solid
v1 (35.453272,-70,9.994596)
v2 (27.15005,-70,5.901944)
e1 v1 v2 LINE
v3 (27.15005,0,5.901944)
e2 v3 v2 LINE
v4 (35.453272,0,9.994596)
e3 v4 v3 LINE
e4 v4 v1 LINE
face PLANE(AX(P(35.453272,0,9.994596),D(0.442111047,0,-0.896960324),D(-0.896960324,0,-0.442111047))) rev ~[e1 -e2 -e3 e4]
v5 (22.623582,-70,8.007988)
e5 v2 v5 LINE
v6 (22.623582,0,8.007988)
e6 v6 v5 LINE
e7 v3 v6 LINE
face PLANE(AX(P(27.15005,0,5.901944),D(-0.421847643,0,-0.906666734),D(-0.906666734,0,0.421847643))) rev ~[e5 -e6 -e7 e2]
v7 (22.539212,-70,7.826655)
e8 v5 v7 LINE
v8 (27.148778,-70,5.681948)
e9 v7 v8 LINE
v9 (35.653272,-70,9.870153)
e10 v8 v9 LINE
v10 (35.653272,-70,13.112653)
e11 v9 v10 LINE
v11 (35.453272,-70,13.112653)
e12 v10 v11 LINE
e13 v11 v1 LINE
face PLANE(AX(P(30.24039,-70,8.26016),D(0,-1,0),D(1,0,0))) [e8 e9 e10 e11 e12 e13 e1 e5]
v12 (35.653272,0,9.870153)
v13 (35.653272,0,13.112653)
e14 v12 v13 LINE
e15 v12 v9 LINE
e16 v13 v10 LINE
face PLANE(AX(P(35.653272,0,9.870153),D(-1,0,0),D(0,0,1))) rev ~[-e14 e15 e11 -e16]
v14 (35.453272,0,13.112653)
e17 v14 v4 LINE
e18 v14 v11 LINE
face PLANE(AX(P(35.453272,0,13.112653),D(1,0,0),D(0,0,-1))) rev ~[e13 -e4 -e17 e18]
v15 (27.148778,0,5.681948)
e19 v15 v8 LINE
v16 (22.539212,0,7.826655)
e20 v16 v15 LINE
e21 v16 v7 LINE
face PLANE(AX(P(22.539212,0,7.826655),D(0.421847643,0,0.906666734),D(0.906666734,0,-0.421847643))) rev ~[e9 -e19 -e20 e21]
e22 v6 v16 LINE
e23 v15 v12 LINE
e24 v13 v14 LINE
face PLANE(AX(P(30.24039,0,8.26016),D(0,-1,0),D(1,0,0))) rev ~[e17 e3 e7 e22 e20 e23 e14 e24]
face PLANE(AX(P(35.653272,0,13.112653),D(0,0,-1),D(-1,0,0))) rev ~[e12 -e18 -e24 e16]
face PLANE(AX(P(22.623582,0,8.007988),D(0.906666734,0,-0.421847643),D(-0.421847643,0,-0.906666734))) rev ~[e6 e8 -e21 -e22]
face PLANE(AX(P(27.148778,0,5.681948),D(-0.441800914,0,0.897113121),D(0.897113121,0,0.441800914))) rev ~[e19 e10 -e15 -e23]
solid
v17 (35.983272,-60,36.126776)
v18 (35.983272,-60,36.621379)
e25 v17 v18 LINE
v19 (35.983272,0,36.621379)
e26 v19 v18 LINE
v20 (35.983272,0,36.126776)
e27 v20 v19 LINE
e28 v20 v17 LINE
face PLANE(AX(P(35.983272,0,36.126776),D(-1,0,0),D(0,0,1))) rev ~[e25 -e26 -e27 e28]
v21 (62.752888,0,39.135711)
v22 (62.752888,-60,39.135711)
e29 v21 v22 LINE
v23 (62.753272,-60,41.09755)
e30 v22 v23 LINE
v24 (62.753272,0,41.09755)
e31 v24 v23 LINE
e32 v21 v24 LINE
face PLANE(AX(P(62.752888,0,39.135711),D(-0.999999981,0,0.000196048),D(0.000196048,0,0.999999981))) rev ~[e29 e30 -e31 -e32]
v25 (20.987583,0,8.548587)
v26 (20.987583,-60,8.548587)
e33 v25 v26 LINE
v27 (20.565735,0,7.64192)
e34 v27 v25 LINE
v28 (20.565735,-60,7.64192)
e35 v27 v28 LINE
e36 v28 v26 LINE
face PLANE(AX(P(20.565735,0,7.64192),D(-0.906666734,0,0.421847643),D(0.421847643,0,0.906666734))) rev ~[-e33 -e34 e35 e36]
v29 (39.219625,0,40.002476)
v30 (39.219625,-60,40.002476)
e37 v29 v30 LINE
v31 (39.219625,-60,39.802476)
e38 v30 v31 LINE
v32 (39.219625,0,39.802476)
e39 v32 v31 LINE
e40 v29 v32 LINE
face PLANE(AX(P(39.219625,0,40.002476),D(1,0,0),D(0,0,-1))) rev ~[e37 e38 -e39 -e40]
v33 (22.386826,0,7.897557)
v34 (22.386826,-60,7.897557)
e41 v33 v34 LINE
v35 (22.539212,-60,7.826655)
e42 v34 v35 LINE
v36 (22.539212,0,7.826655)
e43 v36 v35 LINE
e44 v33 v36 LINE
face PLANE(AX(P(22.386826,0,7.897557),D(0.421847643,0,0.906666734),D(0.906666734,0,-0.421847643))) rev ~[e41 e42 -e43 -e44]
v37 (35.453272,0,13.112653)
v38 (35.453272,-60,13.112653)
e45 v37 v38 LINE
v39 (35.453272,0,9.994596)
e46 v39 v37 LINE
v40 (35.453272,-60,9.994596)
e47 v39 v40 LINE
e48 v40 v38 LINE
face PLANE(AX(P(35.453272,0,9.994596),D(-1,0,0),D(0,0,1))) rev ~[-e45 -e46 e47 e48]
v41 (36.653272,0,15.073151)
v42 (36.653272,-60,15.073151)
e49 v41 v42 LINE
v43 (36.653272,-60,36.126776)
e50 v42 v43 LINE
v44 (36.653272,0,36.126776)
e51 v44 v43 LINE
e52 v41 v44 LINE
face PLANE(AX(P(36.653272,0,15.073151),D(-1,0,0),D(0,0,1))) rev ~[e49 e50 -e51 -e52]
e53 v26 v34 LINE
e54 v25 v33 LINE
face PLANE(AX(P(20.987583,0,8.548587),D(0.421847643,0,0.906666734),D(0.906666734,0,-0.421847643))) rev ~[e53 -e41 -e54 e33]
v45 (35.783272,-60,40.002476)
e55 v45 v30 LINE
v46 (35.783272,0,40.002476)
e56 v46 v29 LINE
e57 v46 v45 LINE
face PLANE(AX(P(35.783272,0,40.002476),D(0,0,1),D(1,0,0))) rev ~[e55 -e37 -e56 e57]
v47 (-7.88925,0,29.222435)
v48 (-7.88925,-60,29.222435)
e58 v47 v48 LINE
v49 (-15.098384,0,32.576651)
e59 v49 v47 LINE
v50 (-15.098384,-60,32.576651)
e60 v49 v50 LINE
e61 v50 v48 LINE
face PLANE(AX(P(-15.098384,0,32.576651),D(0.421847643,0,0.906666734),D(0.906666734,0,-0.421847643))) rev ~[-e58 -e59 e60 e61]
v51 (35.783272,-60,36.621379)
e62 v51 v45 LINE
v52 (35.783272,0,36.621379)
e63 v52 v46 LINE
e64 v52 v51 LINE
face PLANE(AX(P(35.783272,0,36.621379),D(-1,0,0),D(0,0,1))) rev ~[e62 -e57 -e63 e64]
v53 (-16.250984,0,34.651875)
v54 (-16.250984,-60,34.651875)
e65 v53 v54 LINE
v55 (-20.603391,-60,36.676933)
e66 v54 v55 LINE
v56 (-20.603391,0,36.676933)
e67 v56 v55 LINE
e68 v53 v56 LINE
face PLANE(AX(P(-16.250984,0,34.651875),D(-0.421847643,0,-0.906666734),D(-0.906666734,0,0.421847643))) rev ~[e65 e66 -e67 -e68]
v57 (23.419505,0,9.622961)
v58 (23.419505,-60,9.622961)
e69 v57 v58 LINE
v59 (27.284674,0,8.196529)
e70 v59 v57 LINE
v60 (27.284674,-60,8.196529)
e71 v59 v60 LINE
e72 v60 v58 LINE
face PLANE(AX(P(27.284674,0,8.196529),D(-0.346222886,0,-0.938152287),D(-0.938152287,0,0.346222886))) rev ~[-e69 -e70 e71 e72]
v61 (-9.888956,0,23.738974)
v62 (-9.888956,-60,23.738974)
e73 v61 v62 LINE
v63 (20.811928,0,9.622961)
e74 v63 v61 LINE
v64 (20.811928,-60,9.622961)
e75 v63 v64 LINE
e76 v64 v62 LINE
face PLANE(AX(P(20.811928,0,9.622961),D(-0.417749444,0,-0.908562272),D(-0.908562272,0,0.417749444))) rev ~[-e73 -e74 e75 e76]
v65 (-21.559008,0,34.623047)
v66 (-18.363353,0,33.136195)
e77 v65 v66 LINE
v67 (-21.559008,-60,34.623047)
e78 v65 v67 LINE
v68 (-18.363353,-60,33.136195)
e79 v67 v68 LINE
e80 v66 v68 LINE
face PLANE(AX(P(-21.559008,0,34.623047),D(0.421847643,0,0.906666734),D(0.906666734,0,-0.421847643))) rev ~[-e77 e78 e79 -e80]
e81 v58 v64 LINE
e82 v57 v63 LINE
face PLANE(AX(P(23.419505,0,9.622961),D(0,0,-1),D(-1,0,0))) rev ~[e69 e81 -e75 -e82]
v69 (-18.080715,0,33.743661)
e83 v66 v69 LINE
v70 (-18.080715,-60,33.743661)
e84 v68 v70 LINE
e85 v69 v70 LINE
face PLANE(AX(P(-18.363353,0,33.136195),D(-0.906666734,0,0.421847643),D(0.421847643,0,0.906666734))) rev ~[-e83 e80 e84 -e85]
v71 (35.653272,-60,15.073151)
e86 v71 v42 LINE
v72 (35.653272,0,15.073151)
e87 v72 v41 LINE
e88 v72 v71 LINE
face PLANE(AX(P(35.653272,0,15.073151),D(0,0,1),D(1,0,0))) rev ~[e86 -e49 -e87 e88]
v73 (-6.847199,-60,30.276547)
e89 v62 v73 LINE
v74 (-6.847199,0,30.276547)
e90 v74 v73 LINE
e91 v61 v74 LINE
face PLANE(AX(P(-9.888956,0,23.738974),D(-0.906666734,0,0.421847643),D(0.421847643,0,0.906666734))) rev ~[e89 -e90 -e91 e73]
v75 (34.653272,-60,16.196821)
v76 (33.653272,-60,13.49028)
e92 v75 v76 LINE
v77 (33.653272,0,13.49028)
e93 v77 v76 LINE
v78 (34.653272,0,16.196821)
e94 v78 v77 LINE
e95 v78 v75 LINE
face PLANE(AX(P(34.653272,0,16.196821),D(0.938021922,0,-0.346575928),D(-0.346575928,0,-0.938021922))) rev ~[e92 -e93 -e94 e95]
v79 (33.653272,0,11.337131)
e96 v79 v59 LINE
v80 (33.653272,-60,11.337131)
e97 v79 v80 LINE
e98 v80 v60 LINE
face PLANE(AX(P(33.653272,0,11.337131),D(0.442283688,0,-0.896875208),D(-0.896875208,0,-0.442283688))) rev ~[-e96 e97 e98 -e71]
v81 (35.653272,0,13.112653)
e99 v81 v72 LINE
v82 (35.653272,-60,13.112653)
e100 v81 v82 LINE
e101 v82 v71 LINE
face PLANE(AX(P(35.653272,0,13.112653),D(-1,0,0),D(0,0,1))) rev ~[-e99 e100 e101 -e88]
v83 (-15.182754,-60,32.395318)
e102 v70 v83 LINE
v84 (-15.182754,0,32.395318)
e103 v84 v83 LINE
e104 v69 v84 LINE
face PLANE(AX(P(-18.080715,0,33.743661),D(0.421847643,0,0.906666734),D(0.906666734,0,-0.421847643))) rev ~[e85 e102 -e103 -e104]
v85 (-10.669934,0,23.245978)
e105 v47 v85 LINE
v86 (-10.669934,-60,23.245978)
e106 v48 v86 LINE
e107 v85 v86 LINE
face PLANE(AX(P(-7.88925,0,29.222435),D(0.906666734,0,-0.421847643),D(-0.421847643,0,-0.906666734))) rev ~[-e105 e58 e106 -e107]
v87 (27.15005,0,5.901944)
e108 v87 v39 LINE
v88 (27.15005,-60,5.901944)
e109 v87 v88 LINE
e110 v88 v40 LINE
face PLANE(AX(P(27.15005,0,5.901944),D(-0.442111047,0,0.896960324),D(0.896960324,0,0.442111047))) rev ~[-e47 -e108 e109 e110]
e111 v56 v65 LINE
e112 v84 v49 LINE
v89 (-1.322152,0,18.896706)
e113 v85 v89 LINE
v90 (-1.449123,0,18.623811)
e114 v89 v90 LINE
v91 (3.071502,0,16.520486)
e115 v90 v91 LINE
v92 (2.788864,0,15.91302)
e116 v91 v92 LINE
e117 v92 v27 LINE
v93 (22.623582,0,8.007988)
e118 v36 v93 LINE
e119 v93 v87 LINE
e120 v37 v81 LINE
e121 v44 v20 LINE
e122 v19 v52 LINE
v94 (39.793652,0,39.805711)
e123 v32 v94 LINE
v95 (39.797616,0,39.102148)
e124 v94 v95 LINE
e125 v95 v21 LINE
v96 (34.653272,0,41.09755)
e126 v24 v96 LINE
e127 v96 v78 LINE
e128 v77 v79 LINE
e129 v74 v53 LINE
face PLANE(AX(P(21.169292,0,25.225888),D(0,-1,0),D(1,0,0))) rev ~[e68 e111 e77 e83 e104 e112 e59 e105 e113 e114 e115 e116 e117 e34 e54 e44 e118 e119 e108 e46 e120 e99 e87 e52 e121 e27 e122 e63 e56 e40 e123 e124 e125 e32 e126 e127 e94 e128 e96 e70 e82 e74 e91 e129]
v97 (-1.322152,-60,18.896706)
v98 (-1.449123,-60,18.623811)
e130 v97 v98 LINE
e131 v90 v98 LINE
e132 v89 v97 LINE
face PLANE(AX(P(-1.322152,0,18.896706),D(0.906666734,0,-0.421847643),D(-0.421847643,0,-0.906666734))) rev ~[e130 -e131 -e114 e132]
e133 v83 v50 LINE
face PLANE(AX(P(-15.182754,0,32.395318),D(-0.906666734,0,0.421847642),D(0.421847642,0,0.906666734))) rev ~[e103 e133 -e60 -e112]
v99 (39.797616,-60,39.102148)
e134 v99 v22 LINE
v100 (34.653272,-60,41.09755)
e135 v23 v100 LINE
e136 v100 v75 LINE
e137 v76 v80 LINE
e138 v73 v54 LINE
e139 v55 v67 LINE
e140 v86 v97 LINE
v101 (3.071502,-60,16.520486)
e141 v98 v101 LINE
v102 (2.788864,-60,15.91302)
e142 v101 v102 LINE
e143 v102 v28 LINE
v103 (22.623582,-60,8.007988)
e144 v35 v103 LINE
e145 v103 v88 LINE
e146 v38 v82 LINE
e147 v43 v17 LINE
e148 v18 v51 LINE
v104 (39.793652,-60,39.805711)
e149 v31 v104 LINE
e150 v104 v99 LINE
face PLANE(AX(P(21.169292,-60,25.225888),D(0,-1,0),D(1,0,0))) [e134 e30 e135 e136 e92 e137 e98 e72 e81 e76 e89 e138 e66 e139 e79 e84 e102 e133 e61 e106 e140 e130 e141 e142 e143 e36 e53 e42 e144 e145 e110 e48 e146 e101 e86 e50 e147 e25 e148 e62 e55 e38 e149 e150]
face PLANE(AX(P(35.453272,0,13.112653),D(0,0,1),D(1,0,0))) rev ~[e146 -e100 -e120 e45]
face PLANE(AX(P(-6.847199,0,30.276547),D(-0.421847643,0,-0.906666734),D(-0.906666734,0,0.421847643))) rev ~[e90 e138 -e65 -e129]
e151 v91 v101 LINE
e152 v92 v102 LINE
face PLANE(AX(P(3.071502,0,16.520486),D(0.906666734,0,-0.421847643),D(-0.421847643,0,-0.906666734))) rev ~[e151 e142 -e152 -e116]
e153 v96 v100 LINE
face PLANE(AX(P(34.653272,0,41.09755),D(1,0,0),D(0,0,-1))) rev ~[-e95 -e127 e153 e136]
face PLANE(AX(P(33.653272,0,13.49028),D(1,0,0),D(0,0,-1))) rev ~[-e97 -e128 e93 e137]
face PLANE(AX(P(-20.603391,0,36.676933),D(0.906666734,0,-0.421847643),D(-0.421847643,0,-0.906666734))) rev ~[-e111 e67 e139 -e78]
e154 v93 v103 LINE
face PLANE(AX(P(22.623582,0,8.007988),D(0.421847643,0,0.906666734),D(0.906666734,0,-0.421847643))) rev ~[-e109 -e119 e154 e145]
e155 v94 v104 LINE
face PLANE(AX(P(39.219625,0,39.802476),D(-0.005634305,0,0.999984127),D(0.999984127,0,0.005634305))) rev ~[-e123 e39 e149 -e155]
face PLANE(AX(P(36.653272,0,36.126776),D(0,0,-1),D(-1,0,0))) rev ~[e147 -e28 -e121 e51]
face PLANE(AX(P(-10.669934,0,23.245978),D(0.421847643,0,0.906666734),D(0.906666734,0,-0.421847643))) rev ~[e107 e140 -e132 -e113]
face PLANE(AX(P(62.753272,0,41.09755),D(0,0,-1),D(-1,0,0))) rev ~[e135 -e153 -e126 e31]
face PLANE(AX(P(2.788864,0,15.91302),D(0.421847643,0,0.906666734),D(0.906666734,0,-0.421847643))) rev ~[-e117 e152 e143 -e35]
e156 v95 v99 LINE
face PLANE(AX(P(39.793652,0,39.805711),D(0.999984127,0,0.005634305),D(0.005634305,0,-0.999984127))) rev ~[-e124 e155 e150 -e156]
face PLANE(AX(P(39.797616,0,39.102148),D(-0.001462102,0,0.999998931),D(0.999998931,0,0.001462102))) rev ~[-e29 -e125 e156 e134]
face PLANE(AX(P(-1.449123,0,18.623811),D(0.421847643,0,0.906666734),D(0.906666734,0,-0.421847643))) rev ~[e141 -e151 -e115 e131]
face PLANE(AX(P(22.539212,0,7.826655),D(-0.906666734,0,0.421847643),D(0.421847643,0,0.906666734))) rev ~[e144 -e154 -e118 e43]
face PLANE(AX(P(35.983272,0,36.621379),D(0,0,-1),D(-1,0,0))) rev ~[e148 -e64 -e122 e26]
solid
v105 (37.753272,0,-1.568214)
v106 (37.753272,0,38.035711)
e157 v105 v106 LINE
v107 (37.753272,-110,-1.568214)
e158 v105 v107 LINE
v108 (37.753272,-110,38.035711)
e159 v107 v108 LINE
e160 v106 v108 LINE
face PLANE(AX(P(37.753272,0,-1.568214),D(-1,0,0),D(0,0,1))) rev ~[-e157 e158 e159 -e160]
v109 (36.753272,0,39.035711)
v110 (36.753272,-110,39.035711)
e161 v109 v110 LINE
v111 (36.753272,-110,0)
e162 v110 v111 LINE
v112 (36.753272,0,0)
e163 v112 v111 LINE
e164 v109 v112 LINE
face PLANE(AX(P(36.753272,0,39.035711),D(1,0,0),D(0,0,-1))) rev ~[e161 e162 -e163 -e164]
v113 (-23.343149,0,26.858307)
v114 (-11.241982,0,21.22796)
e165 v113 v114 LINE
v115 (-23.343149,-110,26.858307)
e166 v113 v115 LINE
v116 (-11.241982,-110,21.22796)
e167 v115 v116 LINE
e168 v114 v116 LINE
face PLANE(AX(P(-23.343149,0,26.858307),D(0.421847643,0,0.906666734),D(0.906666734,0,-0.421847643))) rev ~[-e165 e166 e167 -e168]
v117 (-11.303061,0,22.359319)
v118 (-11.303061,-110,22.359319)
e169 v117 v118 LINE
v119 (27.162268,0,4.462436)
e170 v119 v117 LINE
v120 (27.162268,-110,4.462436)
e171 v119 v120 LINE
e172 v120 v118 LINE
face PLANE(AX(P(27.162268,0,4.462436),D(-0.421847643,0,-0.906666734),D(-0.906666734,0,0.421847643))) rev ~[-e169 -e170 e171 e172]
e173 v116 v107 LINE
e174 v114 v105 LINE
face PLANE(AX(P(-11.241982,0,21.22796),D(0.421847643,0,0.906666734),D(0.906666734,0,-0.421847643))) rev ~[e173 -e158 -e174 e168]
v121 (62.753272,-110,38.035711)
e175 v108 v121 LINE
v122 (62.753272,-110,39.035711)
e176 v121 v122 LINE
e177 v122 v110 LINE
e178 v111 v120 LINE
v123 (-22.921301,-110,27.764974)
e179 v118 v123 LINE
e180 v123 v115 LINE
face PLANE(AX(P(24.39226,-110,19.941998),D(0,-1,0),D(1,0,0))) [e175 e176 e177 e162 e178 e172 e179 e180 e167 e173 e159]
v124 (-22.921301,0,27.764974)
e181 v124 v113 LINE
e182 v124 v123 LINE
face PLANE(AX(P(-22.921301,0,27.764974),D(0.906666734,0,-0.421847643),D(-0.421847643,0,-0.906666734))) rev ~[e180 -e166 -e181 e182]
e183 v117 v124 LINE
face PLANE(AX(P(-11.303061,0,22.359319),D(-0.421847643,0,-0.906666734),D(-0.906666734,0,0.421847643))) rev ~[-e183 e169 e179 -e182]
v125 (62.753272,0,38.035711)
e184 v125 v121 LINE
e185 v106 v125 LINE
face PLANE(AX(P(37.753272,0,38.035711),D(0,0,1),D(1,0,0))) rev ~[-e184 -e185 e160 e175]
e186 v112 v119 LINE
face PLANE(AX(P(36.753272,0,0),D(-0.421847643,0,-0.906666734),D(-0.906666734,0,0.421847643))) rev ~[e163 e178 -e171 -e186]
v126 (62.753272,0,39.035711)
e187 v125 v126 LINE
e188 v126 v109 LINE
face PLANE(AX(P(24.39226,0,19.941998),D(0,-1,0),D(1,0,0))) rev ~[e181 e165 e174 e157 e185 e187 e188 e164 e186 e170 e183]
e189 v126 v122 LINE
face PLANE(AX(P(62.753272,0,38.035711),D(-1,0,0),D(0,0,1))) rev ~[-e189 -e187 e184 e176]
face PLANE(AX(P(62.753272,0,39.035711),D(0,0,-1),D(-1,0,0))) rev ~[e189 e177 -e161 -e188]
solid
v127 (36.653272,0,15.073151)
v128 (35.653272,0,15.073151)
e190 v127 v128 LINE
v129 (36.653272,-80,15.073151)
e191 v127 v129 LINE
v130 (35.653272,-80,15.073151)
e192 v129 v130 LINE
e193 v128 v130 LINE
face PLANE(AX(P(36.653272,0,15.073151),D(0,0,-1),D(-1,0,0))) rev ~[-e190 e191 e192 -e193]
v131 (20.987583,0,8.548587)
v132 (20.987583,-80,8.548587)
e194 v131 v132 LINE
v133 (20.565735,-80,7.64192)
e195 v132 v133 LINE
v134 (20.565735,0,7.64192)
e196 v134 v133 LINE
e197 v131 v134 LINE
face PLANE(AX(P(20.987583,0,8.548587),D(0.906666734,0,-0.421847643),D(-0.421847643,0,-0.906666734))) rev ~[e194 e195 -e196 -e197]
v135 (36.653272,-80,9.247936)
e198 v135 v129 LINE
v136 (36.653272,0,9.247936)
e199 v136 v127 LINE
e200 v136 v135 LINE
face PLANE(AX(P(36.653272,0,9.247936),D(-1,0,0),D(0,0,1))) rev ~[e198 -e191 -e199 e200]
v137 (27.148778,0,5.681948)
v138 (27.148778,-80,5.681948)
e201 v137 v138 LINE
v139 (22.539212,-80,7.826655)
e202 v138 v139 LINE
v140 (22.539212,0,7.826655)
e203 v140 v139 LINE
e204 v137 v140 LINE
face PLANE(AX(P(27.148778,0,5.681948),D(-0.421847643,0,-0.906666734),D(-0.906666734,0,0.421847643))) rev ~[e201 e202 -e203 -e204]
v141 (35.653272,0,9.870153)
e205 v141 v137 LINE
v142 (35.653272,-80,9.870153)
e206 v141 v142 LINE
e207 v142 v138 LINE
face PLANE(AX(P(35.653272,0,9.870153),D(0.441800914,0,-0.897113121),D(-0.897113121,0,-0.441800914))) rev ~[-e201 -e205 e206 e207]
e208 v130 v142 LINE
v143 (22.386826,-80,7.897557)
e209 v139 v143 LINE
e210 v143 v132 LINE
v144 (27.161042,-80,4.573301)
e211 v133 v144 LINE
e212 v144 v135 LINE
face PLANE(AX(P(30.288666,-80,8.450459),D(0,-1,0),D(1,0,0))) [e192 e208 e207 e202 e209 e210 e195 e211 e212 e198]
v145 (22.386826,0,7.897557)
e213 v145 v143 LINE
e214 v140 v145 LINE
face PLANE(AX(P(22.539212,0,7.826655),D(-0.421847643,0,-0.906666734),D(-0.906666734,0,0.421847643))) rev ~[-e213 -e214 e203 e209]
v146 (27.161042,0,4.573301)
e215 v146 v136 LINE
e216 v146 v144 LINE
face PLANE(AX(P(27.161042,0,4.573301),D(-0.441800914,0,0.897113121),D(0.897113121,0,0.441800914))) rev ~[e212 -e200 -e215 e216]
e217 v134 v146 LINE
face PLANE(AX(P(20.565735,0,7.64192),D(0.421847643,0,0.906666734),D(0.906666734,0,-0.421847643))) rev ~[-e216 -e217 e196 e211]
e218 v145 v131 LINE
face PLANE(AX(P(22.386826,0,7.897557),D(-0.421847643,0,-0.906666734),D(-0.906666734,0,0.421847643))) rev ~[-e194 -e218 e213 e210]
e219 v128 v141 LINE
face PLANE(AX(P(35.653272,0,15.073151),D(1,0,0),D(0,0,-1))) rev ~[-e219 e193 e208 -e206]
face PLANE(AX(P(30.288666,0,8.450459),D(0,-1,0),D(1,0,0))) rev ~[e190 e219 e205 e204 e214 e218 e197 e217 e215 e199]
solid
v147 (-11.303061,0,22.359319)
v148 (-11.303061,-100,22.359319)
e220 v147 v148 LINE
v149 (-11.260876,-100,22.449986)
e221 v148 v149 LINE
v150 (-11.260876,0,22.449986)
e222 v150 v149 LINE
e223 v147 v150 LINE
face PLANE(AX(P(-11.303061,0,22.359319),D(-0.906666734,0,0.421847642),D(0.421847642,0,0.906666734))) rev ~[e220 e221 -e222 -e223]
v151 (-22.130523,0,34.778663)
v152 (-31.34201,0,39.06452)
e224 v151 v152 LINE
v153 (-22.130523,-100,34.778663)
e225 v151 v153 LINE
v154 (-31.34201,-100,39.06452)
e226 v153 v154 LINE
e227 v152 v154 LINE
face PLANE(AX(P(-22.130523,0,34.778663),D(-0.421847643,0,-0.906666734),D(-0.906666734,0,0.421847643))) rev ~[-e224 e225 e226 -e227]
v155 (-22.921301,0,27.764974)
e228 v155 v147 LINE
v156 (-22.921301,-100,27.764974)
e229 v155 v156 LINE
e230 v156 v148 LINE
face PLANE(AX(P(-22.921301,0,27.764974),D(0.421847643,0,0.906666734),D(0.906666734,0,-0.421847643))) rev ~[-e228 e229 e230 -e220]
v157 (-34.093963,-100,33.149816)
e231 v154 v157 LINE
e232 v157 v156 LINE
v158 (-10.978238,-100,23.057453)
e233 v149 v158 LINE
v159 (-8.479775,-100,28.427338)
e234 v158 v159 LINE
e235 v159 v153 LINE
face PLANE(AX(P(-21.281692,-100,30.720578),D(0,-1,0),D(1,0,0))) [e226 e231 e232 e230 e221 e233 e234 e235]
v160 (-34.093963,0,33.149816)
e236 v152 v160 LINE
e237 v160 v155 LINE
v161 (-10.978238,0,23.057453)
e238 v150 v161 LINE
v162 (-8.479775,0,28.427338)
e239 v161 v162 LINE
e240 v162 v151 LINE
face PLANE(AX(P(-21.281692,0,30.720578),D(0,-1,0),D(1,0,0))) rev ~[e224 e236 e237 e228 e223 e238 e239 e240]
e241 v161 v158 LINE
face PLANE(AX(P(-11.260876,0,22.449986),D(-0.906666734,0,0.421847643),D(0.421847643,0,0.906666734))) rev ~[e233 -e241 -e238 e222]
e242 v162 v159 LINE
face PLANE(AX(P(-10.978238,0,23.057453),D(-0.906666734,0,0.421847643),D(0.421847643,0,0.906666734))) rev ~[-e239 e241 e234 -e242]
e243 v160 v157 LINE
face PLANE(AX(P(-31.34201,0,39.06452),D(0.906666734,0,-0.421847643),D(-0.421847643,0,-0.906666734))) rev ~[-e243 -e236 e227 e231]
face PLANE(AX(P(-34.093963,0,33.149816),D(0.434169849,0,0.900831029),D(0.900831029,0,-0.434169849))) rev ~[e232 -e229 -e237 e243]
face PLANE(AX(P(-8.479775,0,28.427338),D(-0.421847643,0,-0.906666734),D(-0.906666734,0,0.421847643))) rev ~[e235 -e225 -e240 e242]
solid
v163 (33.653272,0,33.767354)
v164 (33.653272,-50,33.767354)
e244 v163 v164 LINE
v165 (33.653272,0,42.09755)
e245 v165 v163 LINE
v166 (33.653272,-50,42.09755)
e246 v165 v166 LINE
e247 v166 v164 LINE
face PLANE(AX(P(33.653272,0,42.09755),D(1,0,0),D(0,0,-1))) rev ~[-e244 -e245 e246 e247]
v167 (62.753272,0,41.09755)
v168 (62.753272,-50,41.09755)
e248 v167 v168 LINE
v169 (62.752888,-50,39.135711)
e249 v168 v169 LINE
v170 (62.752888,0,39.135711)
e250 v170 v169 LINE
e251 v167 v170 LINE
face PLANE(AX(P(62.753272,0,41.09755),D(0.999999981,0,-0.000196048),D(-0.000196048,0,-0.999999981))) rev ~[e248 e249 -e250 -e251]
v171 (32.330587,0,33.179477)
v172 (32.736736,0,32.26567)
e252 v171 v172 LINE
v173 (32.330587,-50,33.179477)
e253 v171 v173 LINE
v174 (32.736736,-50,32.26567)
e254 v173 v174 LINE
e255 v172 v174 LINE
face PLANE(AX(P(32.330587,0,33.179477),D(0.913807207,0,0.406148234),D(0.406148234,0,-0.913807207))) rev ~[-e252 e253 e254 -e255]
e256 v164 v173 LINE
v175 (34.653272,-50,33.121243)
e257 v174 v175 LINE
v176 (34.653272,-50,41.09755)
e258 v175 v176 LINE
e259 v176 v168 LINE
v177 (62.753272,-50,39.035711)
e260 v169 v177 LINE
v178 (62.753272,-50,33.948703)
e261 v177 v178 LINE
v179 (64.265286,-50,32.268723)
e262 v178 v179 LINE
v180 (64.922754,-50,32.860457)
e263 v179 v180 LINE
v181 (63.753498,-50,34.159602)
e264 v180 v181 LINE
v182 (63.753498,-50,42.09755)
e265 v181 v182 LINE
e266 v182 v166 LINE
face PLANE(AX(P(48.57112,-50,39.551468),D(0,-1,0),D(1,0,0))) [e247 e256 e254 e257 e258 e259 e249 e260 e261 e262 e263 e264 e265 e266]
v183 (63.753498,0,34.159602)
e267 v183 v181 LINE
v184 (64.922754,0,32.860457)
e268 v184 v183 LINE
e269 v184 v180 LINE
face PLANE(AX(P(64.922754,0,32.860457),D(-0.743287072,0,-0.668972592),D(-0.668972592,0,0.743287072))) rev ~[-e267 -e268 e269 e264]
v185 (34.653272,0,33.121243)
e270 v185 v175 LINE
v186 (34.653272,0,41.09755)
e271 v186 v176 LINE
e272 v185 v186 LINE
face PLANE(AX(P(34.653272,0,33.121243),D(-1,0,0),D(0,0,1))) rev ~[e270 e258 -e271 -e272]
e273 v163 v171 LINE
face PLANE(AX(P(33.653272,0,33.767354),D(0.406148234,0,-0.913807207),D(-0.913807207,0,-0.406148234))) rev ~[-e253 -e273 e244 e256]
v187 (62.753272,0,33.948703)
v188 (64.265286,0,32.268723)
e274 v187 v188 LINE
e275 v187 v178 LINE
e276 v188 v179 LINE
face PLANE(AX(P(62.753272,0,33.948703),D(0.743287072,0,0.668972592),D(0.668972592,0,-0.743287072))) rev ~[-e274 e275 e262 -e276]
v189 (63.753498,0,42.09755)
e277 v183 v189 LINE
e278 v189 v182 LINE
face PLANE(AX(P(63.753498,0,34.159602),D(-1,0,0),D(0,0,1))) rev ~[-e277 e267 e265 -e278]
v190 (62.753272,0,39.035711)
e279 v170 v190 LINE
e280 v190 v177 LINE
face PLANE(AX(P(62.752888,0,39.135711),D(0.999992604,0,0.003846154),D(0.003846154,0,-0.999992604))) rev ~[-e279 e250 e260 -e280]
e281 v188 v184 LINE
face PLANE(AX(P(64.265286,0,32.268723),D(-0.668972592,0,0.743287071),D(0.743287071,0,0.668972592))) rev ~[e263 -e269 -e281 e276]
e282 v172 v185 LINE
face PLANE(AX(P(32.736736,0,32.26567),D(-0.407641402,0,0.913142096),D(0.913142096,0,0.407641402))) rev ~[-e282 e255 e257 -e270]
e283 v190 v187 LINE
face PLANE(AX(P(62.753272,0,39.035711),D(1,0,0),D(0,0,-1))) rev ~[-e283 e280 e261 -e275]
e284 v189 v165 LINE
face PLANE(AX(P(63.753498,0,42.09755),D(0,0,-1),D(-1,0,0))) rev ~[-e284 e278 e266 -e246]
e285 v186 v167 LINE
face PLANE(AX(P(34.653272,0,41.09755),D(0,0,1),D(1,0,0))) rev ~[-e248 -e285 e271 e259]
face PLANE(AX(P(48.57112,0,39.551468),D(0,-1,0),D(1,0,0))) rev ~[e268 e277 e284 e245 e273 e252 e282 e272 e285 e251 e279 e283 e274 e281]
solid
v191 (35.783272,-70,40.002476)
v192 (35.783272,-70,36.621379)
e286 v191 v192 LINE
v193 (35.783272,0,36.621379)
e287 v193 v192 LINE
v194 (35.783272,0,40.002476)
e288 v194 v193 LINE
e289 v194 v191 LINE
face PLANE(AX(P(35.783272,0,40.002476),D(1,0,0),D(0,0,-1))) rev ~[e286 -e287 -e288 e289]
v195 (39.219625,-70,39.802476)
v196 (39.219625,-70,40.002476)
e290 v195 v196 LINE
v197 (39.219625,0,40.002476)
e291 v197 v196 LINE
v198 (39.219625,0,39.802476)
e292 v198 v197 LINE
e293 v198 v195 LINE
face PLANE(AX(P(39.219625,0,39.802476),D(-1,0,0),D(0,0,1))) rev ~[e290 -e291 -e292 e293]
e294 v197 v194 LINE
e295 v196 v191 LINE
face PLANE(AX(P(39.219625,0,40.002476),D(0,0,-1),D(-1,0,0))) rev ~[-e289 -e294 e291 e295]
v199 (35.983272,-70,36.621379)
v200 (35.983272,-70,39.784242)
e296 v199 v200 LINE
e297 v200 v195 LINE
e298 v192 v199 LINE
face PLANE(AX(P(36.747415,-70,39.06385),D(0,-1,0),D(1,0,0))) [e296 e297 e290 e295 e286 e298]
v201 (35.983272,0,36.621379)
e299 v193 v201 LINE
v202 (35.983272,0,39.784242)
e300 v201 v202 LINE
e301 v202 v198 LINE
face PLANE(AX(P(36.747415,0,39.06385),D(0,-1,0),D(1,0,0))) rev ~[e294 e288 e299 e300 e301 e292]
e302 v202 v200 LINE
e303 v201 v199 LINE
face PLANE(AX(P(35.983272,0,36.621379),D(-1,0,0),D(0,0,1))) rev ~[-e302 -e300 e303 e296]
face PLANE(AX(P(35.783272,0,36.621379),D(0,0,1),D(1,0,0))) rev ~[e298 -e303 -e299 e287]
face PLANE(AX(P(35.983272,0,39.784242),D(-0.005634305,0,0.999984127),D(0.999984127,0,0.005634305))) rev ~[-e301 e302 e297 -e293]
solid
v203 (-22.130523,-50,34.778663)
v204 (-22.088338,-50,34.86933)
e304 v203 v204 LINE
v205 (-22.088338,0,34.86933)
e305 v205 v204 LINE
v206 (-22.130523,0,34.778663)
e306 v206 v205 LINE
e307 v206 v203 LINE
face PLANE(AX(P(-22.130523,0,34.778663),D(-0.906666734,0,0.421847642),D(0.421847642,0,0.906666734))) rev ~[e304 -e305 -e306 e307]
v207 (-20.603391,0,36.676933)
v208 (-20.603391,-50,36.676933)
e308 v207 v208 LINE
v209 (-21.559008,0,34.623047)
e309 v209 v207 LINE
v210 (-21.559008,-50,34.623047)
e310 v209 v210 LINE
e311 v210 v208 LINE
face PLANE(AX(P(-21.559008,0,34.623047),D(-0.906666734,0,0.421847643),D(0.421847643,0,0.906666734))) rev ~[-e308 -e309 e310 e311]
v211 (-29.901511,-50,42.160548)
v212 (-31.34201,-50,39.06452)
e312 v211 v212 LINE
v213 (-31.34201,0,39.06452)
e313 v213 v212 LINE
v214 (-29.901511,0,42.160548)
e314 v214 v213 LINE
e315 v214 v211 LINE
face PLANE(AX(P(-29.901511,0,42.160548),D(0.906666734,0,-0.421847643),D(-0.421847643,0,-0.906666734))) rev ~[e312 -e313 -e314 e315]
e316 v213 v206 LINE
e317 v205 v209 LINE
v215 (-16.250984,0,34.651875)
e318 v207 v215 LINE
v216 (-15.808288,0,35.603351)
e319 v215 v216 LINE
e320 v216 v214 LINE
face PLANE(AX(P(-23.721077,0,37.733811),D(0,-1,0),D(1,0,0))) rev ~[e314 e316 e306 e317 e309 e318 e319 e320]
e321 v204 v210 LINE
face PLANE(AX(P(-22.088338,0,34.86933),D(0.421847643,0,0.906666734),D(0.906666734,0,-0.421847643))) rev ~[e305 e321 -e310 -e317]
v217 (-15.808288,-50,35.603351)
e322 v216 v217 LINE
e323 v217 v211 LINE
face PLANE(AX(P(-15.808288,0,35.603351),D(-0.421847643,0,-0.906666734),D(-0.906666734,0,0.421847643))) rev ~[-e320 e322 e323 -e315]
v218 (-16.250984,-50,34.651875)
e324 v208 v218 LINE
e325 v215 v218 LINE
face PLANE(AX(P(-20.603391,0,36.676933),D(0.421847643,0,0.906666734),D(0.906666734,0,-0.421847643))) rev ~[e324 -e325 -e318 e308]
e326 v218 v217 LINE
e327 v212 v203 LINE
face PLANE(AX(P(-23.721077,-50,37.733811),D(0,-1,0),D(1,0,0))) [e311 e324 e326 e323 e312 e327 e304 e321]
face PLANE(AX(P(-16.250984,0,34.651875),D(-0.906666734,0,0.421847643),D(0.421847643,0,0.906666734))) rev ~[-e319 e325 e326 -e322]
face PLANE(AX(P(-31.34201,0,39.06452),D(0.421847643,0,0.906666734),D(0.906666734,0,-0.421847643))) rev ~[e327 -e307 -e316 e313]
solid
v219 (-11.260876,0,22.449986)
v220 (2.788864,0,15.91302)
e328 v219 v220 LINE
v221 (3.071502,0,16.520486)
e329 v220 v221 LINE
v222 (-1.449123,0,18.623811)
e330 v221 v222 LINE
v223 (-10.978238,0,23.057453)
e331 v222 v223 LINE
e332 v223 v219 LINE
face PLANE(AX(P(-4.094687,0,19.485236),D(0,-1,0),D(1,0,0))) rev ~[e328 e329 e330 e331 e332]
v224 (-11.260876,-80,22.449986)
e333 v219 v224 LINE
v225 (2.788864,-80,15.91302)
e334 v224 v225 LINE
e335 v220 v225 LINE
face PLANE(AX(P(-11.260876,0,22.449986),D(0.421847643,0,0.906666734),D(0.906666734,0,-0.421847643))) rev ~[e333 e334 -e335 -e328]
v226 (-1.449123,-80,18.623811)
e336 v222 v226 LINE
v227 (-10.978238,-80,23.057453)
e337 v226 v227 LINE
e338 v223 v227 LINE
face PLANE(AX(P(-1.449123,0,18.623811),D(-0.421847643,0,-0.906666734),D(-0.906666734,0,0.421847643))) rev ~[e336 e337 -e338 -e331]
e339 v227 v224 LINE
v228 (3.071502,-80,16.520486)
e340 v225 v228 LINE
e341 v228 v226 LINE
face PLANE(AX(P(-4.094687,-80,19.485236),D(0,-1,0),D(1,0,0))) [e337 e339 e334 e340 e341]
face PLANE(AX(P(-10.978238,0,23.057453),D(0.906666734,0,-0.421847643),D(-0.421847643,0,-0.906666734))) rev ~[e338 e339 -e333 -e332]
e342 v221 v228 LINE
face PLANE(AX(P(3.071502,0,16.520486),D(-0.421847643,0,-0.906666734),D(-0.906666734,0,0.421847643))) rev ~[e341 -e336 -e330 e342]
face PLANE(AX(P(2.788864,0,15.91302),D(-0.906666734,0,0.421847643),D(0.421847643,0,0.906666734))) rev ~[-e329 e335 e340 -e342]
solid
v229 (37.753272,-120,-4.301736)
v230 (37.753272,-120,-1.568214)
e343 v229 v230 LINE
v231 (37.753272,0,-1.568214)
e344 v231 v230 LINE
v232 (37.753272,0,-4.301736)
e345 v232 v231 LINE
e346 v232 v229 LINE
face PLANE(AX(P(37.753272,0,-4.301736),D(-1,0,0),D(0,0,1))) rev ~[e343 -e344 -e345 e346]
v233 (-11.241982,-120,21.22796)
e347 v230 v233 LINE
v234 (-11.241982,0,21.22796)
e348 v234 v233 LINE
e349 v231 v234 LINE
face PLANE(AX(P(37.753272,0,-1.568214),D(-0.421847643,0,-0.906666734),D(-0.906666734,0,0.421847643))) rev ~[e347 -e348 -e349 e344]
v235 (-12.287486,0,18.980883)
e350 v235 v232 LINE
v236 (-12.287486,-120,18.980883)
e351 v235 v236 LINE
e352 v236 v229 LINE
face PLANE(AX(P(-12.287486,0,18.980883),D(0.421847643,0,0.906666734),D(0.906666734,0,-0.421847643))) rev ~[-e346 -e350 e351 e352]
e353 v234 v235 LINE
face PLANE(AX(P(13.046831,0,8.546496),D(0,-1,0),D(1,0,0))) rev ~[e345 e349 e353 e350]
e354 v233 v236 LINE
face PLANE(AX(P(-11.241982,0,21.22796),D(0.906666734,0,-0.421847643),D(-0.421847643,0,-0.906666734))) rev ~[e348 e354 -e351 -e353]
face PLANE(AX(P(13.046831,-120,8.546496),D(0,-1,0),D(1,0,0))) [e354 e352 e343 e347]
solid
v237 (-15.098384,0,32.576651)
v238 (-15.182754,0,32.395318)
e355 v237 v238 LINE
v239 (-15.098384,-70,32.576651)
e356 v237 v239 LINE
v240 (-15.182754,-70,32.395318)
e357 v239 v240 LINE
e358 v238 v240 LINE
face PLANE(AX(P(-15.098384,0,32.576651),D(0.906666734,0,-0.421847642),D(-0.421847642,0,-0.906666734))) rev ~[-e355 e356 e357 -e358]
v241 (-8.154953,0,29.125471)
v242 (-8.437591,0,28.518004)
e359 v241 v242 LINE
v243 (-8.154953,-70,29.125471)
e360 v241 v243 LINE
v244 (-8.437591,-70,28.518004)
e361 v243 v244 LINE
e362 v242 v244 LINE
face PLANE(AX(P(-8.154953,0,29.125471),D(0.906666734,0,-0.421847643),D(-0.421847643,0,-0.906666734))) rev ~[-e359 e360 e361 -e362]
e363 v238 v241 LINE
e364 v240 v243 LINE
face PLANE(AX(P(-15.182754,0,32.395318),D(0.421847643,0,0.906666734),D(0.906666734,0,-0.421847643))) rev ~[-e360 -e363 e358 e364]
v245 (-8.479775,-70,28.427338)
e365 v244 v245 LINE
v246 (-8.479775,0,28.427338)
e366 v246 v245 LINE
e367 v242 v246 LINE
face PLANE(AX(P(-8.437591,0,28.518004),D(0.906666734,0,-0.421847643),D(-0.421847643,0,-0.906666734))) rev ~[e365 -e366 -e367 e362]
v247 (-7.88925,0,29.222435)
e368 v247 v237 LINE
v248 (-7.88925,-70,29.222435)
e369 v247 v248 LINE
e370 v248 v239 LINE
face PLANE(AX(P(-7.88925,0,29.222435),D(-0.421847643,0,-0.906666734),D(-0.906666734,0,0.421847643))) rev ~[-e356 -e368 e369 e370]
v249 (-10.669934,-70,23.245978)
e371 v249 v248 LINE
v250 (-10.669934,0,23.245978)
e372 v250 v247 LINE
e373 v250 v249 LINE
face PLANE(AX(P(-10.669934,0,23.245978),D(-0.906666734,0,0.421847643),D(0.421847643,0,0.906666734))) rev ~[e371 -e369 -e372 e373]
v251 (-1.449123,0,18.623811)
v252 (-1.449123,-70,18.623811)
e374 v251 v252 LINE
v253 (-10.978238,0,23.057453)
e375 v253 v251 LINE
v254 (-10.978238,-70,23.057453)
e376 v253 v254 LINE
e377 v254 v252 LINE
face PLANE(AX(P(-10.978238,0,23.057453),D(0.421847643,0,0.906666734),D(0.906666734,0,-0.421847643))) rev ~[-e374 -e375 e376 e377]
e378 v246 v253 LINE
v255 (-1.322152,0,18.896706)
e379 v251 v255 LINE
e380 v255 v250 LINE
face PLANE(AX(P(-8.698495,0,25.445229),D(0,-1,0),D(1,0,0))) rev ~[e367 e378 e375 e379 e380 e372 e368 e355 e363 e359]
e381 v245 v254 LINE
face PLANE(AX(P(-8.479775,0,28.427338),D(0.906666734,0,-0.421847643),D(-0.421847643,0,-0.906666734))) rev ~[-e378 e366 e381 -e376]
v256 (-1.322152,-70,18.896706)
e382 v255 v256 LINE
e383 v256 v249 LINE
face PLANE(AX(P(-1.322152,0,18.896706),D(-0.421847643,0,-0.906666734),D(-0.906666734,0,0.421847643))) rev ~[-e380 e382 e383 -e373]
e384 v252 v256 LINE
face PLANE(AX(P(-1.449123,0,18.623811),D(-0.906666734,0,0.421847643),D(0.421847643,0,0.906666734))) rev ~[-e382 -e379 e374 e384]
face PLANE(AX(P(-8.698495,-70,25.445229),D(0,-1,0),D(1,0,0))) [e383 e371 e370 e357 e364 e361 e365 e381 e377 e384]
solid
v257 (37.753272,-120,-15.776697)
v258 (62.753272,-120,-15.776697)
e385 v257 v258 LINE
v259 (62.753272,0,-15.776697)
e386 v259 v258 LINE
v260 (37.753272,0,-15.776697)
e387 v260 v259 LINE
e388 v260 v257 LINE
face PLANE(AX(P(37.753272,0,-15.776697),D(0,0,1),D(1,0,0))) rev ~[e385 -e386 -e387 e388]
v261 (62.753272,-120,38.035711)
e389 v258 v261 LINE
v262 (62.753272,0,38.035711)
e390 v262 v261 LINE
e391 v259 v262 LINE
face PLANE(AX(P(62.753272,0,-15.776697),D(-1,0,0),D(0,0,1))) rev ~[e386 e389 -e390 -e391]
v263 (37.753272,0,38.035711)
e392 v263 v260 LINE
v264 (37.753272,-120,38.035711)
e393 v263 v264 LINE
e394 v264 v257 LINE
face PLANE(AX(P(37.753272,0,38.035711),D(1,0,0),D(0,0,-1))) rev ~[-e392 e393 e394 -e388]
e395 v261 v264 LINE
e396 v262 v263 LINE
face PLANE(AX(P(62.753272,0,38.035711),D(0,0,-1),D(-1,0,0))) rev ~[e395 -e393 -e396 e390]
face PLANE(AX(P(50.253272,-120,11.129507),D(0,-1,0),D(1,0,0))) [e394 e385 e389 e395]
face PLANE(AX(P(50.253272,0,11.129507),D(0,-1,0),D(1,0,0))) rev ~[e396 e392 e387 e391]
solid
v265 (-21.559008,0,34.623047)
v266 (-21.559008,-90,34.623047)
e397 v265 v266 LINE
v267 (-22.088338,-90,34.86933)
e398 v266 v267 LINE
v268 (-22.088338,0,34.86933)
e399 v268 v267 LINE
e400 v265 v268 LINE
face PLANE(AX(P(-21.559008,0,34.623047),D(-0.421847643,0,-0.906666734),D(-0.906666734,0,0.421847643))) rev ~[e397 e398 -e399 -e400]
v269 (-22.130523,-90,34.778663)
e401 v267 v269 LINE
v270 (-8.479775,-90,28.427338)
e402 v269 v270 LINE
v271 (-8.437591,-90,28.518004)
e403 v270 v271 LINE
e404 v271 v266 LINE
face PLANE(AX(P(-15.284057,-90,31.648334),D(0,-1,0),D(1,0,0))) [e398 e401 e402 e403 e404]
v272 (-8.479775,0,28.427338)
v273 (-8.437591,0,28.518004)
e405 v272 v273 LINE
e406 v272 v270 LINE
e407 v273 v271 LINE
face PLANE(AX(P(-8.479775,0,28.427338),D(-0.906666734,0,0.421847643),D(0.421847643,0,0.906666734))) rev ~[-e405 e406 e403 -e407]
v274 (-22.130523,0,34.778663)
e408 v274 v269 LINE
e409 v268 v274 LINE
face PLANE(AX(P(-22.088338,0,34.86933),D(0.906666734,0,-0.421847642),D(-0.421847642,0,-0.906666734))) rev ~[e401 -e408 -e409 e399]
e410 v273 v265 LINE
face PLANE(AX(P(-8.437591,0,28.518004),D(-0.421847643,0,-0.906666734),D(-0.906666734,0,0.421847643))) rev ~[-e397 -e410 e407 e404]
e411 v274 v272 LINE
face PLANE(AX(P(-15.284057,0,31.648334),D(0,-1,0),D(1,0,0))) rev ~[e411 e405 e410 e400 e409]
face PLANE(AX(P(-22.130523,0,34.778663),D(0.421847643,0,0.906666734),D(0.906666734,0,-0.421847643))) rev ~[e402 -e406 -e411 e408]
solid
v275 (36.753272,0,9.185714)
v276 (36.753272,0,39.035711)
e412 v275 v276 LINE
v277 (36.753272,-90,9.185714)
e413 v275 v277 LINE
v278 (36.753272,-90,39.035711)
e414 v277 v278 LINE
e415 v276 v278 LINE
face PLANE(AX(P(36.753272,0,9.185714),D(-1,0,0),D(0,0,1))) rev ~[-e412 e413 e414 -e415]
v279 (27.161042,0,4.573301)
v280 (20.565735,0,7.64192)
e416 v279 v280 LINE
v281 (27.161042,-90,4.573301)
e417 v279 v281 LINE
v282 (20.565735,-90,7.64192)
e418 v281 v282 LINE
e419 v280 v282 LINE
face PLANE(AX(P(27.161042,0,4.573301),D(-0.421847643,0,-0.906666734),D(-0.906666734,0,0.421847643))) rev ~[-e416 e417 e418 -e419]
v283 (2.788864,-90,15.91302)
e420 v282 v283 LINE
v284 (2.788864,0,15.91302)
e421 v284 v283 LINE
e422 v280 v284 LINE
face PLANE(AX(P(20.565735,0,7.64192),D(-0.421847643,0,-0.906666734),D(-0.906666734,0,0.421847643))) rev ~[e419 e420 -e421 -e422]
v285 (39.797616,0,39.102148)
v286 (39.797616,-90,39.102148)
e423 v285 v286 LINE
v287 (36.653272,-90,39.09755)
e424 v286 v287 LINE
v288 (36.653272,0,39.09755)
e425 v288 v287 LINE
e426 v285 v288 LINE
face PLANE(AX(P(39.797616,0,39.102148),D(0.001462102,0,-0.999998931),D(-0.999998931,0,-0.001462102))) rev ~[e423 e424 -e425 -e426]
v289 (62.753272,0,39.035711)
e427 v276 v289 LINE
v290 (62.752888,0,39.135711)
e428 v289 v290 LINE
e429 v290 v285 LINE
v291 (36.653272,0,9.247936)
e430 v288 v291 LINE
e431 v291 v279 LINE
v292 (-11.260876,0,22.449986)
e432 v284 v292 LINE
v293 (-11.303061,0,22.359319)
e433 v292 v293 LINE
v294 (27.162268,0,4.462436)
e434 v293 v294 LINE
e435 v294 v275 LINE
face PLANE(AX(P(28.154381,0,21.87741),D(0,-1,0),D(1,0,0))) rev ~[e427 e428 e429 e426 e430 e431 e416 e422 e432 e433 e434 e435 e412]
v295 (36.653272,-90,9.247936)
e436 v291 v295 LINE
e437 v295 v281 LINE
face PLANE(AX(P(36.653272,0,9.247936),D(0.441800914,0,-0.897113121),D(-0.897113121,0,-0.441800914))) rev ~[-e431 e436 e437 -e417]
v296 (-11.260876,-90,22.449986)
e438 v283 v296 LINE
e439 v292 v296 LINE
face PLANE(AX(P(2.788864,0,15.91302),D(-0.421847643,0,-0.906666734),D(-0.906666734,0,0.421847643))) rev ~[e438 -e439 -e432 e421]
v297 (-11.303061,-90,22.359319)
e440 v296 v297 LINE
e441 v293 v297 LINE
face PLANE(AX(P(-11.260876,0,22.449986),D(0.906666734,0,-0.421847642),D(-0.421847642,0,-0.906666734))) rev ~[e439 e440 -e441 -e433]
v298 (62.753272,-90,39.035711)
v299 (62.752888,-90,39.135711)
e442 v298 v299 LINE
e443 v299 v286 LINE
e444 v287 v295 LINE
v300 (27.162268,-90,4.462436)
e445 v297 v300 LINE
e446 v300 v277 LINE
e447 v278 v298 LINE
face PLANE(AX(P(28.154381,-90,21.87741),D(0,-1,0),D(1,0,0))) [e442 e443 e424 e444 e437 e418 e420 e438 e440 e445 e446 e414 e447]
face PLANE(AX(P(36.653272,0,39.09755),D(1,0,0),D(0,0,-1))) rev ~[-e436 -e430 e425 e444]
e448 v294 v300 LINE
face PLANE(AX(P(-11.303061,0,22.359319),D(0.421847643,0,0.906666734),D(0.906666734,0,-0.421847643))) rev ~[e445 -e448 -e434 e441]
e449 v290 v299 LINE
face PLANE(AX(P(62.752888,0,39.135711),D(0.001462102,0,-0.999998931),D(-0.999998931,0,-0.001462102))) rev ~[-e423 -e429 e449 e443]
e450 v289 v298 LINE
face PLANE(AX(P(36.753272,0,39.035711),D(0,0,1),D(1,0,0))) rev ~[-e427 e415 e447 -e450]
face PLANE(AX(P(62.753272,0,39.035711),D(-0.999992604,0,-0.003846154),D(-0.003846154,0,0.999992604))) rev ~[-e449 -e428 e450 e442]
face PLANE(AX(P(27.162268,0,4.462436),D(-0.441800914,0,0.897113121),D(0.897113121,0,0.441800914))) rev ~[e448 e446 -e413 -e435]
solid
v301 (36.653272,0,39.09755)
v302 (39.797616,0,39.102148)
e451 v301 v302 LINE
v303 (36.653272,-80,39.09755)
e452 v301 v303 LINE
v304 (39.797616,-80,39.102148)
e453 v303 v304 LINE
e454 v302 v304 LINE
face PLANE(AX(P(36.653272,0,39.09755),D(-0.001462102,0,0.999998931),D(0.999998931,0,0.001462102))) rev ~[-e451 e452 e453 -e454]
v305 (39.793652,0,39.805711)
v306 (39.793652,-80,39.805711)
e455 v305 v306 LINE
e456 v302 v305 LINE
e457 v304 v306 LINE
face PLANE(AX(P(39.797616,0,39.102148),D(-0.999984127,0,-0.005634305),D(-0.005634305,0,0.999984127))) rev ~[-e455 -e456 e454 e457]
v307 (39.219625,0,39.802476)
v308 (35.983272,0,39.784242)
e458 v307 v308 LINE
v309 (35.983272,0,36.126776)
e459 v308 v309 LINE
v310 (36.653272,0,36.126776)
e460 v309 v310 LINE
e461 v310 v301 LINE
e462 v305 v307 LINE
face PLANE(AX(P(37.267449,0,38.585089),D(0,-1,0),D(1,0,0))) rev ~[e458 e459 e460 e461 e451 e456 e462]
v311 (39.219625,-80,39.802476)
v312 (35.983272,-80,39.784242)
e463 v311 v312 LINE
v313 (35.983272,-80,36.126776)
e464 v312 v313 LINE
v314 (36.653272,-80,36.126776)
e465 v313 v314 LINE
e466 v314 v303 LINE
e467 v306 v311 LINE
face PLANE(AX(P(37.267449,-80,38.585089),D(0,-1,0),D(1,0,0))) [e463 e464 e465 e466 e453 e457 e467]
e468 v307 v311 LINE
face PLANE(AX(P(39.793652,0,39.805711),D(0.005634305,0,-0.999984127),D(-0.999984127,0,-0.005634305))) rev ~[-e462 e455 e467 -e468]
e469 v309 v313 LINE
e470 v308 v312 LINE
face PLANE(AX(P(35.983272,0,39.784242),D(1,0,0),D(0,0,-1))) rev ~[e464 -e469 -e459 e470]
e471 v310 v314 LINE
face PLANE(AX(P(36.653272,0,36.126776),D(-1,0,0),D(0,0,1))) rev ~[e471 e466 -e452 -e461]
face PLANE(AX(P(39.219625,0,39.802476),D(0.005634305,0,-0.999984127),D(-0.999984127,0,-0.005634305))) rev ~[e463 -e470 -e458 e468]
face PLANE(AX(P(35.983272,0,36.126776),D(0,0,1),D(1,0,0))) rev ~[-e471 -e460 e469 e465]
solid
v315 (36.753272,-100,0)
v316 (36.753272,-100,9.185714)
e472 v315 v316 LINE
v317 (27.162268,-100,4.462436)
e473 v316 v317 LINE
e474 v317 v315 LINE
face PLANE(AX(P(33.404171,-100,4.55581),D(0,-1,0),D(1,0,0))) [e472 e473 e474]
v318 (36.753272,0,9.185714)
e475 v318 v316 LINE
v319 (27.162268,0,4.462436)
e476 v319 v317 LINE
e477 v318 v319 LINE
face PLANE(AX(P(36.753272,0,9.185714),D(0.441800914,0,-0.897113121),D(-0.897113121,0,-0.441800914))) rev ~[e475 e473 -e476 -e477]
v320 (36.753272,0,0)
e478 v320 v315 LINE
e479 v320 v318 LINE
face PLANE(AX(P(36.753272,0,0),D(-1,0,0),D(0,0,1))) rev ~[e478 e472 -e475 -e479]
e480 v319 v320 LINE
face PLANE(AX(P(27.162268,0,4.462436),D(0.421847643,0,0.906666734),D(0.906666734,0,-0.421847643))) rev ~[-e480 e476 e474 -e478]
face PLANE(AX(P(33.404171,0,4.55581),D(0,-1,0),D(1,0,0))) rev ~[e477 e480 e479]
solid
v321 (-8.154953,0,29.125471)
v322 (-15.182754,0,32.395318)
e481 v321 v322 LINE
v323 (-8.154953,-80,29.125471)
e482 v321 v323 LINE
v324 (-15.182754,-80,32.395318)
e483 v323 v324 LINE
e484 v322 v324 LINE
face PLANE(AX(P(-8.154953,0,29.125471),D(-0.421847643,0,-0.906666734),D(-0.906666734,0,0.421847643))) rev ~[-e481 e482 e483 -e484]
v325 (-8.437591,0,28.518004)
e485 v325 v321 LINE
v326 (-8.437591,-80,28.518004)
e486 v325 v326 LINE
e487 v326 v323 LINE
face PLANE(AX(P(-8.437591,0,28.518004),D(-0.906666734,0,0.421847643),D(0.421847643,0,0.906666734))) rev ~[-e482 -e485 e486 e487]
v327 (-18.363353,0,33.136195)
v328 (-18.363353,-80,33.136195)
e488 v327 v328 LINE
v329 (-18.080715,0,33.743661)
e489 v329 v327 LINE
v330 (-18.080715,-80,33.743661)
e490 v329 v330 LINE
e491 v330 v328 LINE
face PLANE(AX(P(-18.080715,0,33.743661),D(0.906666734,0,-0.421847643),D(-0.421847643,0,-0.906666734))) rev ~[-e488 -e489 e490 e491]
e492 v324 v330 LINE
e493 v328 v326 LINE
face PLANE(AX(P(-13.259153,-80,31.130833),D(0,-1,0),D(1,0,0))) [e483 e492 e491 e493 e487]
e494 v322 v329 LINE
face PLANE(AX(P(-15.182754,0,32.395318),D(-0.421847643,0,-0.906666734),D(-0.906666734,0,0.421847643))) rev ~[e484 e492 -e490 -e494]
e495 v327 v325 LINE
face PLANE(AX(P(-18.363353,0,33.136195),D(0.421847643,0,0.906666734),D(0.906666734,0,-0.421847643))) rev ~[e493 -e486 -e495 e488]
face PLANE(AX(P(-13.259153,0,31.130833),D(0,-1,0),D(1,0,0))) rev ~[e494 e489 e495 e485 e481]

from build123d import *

# Parameters (mm, degrees)
F1_DEPTH  = 120
F2_DEPTH  = 120
F3_DEPTH  = 110
F4_DEPTH  = 100
F5_DEPTH  = 100
F6_DEPTH  = 90
F7_DEPTH  = 90
F8_DEPTH  = 80
F9_DEPTH  = 80
F10_DEPTH = 80
F11_DEPTH = 80
F12_DEPTH = 70
F13_DEPTH = 70
F14_DEPTH = 70
F15_DEPTH = 60
F16_DEPTH = 50
F17_DEPTH = 50


with BuildPart() as f1:
    # F0 (on Front) → F1 (new body)
    with BuildSketch(Plane.XZ):
        Polygon((62.7532724798, 38.0357114375), (37.7532724798, 38.0357114375), (37.7532724798, -1.5682141957), (37.7532724798, -4.3017355892), (37.7532724798, -15.7766969041), (62.7532724798, -15.7766969041), (62.7532724798, 33.9487026308), align=None)
    extrude(amount=F1_DEPTH)


with BuildPart() as f2:
    # F0 (on Front) → F2 (new body)
    with BuildSketch(Plane.XZ):
        Polygon((37.7532724798, -4.3017355892), (37.7532724798, -1.5682141957), (-11.2419818741, 21.2279597301), (-12.2874860827, 18.9808833218), align=None)
    extrude(amount=F2_DEPTH)


with BuildPart() as f3:
    # F0 (on Front) → F3 (new body)
    with BuildSketch(Plane.XZ):
        Polygon((37.7532724798, -1.5682141957), (37.7532724798, 38.0357114375), (62.7532724798, 38.0357114375), (62.7532724798, 39.0357114375), (36.7532724798, 39.0357114375), (36.7532724798, 9.1857140462), (36.7532724798, 0), (27.1622682206, 4.462436293), (-11.3030609789, 22.3593192893), (-22.9213011947, 27.7649739423), (-23.3431488375, 26.8583072085), (-11.2419818741, 21.2279597301), align=None)
    extrude(amount=F3_DEPTH)


with BuildPart() as f4:
    # F0 (on Front) → F4 (new body)
    with BuildSketch(Plane.XZ):
        Polygon((-34.093962769, 33.1498159787), (-22.9213011947, 27.7649739423), (-11.3030609789, 22.3593192893), (-11.2608762147, 22.4499859627), (-10.978238294, 23.0574526744), (-8.4797753205, 28.427337519), (-22.130522729, 34.7786630963), (-31.3420099408, 39.0645203158), align=None)
    extrude(amount=F4_DEPTH)


with BuildPart() as f5:
    # F0 (on Front) → F5 (new body)
    with BuildSketch(Plane.XZ):
        Polygon((36.7532724798, 0), (36.7532724798, 9.1857140462), (27.1622682206, 4.462436293), align=None)
    extrude(amount=F5_DEPTH)


with BuildPart() as f6:
    # F0 (on Front) → F6 (new body)
    with BuildSketch(Plane.XZ):
        Polygon((-22.0883379648, 34.8693297696), (-22.130522729, 34.7786630963), (-8.4797753205, 28.427337519), (-8.4375905562, 28.5180041924), (-18.3633532114, 33.1361945624), (-21.5590084305, 34.6230469758), align=None)
    extrude(amount=F6_DEPTH)


with BuildPart() as f7:
    # F0 (on Front) → F7 (new body)
    with BuildSketch(Plane.XZ):
        Polygon((36.7532724798, 39.0357114375), (62.7532724798, 39.0357114375), (62.7528878644, 39.1357106978), (39.7976157027, 39.102147702), (36.6532724798, 39.0975503451), (36.6532724798, 36.1267757076), (36.6532724798, 15.0731514328), (36.6532724798, 9.2479357519), (27.1610418439, 4.5733010026), (20.5657351541, 7.641919798), (2.7888639591, 15.9130197843), (-11.2608762147, 22.4499859627), (-11.3030609789, 22.3593192893), (27.1622682206, 4.462436293), (36.7532724798, 9.1857140462), align=None)
    extrude(amount=F7_DEPTH)


with BuildPart() as f8:
    # F0 (on Front) → F8 (new body)
    with BuildSketch(Plane.XZ):
        Polygon((-18.3633532114, 33.1361945624), (-8.4375905562, 28.5180041924), (-8.1549526356, 29.1254709041), (-15.182753971, 32.3953178244), (-18.0807152907, 33.743661274), align=None)
    extrude(amount=F8_DEPTH)


with BuildPart() as f9:
    # F0 (on Front) → F9 (new body)
    with BuildSketch(Plane.XZ):
        Polygon((-10.978238294, 23.0574526744), (-11.2608762147, 22.4499859627), (2.7888639591, 15.9130197843), (3.0715018798, 16.520486496), (-1.4491225172, 18.6238114275), align=None)
    extrude(amount=F9_DEPTH)


with BuildPart() as f10:
    # F0 (on Front) → F10 (new body)
    with BuildSketch(Plane.XZ):
        Polygon((36.6532724798, 9.2479357519), (36.6532724798, 15.0731514328), (35.6532724798, 15.0731514328), (35.6532724798, 13.1126534771), (35.6532724798, 9.8701528088), (27.1487780767, 5.6819480983), (22.5392122094, 7.8266551035), (22.3868255866, 7.8975565001), (20.9875827969, 8.5485865318), (20.5657351541, 7.641919798), (27.1610418439, 4.5733010026), align=None)
    extrude(amount=F10_DEPTH)


with BuildPart() as f11:
    # F0 (on Front) → F11 (new body)
    with BuildSketch(Plane.XZ):
        Polygon((36.6532724798, 39.0975503451), (39.7976157027, 39.102147702), (39.793651551, 39.8057106978), (39.2196251732, 39.8024764065), (35.9832724798, 39.7842415175), (35.9832724798, 36.6213790533), (35.9832724798, 36.1267757076), (36.6532724798, 36.1267757076), align=None)
    extrude(amount=F11_DEPTH)


with BuildPart() as f12:
    # F0 (on Front) → F12 (new body)
    with BuildSketch(Plane.XZ):
        Polygon((-8.4797753205, 28.427337519), (-10.978238294, 23.0574526744), (-1.4491225172, 18.6238114275), (-1.3221520646, 18.8967058894), (-10.6699344947, 23.2459776078), (-7.8892497602, 29.2224347223), (-15.0983844425, 32.5766511712), (-15.182753971, 32.3953178244), (-8.1549526356, 29.1254709041), (-8.4375905562, 28.5180041924), align=None)
    extrude(amount=F12_DEPTH)


with BuildPart() as f13:
    # F0 (on Front) → F13 (new body)
    with BuildSketch(Plane.XZ):
        Polygon((35.6532724798, 9.8701528088), (35.6532724798, 13.1126534771), (35.4532724798, 13.1126534771), (35.4532724798, 9.9945962201), (27.1500502265, 5.9019444202), (22.623581738, 8.0079884503), (22.5392122094, 7.8266551035), (27.1487780767, 5.6819480983), align=None)
    extrude(amount=F13_DEPTH)


with BuildPart() as f14:
    # F0 (on Front) → F14 (new body)
    with BuildSketch(Plane.XZ):
        Polygon((35.9832724798, 39.7842415175), (39.2196251732, 39.8024764065), (39.2196251732, 40.0024764065), (35.7832724798, 40.0024764065), (35.7832724798, 36.6213790533), (35.9832724798, 36.6213790533), align=None)
    extrude(amount=F14_DEPTH)


with BuildPart() as f15:
    # F0 (on Front) → F15 (new body)
    with BuildSketch(Plane.XZ):
        Polygon((39.7976157027, 39.102147702), (62.7528878644, 39.1357106978), (62.7532724798, 41.0975503451), (47.1063793285, 41.0975503451), (46.2950781567, 41.0975503451), (34.6532724798, 41.0975503451), (34.6532724798, 33.1212431192), (34.6532724798, 16.1968208849), (33.6532724798, 13.4902799919), (33.6532724798, 11.3371306487), (27.2846735988, 8.1965293971), (23.4195049673, 9.6229607518), (20.8119284672, 9.6229607518), (-9.8889558036, 23.7389743125), (-6.8471991162, 30.2765469362), (-16.2509841568, 34.6518751628), (-20.6033906013, 36.6769328059), (-21.5590084305, 34.6230469758), (-18.3633532114, 33.1361945624), (-18.0807152907, 33.743661274), (-15.182753971, 32.3953178244), (-15.0983844425, 32.5766511712), (-7.8892497602, 29.2224347223), (-10.6699344947, 23.2459776078), (-1.3221520646, 18.8967058894), (-1.4491225172, 18.6238114275), (3.0715018798, 16.520486496), (2.7888639591, 15.9130197843), (20.5657351541, 7.641919798), (20.9875827969, 8.5485865318), (22.3868255866, 7.8975565001), (22.5392122094, 7.8266551035), (22.623581738, 8.0079884503), (27.1500502265, 5.9019444202), (35.4532724798, 9.9945962201), (35.4532724798, 13.1126534771), (35.6532724798, 13.1126534771), (35.6532724798, 15.0731514328), (36.6532724798, 15.0731514328), (36.6532724798, 36.1267757076), (35.9832724798, 36.1267757076), (35.9832724798, 36.6213790533), (35.7832724798, 36.6213790533), (35.7832724798, 40.0024764065), (39.2196251732, 40.0024764065), (39.2196251732, 39.8024764065), (39.793651551, 39.8057106978), align=None)
    extrude(amount=F15_DEPTH)


with BuildPart() as f16:
    # F0 (on Front) → F16 (new body)
    with BuildSketch(Plane.XZ):
        Polygon((-29.9015114106, 42.1605482769), (-31.3420099408, 39.0645203158), (-22.130522729, 34.7786630963), (-22.0883379648, 34.8693297696), (-21.5590084305, 34.6230469758), (-20.6033906013, 36.6769328059), (-16.2509841568, 34.6518751628), (-15.8082882201, 35.6033506205), align=None)
    extrude(amount=F16_DEPTH)


with BuildPart() as f17:
    # F0 (on Front) → F17 (new body)
    with BuildSketch(Plane.XZ):
        Polygon((62.7532724798, 39.0357114375), (62.7532724798, 38.0357114375), (62.7532724798, 33.9487026308), (64.2652862209, 32.2687230941), (64.9227538708, 32.8604565643), (63.7534983963, 34.1596016824), (63.7534983963, 42.0975503451), (33.6532724798, 42.0975503451), (33.6532724798, 33.7673542435), (32.3305874402, 33.1794772946), (32.7367356742, 32.2656700874), (34.6532724798, 33.1212431192), (34.6532724798, 41.0975503451), (46.2950781567, 41.0975503451), (47.1063793285, 41.0975503451), (62.7532724798, 41.0975503451), (62.7528878644, 39.1357106978), align=None)
    extrude(amount=F17_DEPTH)


solid = Compound([f1.part, f2.part, f3.part, f4.part, f5.part, f6.part, f7.part, f8.part, f9.part, f10.part, f11.part, f12.part, f13.part, f14.part, f15.part, f16.part, f17.part])
